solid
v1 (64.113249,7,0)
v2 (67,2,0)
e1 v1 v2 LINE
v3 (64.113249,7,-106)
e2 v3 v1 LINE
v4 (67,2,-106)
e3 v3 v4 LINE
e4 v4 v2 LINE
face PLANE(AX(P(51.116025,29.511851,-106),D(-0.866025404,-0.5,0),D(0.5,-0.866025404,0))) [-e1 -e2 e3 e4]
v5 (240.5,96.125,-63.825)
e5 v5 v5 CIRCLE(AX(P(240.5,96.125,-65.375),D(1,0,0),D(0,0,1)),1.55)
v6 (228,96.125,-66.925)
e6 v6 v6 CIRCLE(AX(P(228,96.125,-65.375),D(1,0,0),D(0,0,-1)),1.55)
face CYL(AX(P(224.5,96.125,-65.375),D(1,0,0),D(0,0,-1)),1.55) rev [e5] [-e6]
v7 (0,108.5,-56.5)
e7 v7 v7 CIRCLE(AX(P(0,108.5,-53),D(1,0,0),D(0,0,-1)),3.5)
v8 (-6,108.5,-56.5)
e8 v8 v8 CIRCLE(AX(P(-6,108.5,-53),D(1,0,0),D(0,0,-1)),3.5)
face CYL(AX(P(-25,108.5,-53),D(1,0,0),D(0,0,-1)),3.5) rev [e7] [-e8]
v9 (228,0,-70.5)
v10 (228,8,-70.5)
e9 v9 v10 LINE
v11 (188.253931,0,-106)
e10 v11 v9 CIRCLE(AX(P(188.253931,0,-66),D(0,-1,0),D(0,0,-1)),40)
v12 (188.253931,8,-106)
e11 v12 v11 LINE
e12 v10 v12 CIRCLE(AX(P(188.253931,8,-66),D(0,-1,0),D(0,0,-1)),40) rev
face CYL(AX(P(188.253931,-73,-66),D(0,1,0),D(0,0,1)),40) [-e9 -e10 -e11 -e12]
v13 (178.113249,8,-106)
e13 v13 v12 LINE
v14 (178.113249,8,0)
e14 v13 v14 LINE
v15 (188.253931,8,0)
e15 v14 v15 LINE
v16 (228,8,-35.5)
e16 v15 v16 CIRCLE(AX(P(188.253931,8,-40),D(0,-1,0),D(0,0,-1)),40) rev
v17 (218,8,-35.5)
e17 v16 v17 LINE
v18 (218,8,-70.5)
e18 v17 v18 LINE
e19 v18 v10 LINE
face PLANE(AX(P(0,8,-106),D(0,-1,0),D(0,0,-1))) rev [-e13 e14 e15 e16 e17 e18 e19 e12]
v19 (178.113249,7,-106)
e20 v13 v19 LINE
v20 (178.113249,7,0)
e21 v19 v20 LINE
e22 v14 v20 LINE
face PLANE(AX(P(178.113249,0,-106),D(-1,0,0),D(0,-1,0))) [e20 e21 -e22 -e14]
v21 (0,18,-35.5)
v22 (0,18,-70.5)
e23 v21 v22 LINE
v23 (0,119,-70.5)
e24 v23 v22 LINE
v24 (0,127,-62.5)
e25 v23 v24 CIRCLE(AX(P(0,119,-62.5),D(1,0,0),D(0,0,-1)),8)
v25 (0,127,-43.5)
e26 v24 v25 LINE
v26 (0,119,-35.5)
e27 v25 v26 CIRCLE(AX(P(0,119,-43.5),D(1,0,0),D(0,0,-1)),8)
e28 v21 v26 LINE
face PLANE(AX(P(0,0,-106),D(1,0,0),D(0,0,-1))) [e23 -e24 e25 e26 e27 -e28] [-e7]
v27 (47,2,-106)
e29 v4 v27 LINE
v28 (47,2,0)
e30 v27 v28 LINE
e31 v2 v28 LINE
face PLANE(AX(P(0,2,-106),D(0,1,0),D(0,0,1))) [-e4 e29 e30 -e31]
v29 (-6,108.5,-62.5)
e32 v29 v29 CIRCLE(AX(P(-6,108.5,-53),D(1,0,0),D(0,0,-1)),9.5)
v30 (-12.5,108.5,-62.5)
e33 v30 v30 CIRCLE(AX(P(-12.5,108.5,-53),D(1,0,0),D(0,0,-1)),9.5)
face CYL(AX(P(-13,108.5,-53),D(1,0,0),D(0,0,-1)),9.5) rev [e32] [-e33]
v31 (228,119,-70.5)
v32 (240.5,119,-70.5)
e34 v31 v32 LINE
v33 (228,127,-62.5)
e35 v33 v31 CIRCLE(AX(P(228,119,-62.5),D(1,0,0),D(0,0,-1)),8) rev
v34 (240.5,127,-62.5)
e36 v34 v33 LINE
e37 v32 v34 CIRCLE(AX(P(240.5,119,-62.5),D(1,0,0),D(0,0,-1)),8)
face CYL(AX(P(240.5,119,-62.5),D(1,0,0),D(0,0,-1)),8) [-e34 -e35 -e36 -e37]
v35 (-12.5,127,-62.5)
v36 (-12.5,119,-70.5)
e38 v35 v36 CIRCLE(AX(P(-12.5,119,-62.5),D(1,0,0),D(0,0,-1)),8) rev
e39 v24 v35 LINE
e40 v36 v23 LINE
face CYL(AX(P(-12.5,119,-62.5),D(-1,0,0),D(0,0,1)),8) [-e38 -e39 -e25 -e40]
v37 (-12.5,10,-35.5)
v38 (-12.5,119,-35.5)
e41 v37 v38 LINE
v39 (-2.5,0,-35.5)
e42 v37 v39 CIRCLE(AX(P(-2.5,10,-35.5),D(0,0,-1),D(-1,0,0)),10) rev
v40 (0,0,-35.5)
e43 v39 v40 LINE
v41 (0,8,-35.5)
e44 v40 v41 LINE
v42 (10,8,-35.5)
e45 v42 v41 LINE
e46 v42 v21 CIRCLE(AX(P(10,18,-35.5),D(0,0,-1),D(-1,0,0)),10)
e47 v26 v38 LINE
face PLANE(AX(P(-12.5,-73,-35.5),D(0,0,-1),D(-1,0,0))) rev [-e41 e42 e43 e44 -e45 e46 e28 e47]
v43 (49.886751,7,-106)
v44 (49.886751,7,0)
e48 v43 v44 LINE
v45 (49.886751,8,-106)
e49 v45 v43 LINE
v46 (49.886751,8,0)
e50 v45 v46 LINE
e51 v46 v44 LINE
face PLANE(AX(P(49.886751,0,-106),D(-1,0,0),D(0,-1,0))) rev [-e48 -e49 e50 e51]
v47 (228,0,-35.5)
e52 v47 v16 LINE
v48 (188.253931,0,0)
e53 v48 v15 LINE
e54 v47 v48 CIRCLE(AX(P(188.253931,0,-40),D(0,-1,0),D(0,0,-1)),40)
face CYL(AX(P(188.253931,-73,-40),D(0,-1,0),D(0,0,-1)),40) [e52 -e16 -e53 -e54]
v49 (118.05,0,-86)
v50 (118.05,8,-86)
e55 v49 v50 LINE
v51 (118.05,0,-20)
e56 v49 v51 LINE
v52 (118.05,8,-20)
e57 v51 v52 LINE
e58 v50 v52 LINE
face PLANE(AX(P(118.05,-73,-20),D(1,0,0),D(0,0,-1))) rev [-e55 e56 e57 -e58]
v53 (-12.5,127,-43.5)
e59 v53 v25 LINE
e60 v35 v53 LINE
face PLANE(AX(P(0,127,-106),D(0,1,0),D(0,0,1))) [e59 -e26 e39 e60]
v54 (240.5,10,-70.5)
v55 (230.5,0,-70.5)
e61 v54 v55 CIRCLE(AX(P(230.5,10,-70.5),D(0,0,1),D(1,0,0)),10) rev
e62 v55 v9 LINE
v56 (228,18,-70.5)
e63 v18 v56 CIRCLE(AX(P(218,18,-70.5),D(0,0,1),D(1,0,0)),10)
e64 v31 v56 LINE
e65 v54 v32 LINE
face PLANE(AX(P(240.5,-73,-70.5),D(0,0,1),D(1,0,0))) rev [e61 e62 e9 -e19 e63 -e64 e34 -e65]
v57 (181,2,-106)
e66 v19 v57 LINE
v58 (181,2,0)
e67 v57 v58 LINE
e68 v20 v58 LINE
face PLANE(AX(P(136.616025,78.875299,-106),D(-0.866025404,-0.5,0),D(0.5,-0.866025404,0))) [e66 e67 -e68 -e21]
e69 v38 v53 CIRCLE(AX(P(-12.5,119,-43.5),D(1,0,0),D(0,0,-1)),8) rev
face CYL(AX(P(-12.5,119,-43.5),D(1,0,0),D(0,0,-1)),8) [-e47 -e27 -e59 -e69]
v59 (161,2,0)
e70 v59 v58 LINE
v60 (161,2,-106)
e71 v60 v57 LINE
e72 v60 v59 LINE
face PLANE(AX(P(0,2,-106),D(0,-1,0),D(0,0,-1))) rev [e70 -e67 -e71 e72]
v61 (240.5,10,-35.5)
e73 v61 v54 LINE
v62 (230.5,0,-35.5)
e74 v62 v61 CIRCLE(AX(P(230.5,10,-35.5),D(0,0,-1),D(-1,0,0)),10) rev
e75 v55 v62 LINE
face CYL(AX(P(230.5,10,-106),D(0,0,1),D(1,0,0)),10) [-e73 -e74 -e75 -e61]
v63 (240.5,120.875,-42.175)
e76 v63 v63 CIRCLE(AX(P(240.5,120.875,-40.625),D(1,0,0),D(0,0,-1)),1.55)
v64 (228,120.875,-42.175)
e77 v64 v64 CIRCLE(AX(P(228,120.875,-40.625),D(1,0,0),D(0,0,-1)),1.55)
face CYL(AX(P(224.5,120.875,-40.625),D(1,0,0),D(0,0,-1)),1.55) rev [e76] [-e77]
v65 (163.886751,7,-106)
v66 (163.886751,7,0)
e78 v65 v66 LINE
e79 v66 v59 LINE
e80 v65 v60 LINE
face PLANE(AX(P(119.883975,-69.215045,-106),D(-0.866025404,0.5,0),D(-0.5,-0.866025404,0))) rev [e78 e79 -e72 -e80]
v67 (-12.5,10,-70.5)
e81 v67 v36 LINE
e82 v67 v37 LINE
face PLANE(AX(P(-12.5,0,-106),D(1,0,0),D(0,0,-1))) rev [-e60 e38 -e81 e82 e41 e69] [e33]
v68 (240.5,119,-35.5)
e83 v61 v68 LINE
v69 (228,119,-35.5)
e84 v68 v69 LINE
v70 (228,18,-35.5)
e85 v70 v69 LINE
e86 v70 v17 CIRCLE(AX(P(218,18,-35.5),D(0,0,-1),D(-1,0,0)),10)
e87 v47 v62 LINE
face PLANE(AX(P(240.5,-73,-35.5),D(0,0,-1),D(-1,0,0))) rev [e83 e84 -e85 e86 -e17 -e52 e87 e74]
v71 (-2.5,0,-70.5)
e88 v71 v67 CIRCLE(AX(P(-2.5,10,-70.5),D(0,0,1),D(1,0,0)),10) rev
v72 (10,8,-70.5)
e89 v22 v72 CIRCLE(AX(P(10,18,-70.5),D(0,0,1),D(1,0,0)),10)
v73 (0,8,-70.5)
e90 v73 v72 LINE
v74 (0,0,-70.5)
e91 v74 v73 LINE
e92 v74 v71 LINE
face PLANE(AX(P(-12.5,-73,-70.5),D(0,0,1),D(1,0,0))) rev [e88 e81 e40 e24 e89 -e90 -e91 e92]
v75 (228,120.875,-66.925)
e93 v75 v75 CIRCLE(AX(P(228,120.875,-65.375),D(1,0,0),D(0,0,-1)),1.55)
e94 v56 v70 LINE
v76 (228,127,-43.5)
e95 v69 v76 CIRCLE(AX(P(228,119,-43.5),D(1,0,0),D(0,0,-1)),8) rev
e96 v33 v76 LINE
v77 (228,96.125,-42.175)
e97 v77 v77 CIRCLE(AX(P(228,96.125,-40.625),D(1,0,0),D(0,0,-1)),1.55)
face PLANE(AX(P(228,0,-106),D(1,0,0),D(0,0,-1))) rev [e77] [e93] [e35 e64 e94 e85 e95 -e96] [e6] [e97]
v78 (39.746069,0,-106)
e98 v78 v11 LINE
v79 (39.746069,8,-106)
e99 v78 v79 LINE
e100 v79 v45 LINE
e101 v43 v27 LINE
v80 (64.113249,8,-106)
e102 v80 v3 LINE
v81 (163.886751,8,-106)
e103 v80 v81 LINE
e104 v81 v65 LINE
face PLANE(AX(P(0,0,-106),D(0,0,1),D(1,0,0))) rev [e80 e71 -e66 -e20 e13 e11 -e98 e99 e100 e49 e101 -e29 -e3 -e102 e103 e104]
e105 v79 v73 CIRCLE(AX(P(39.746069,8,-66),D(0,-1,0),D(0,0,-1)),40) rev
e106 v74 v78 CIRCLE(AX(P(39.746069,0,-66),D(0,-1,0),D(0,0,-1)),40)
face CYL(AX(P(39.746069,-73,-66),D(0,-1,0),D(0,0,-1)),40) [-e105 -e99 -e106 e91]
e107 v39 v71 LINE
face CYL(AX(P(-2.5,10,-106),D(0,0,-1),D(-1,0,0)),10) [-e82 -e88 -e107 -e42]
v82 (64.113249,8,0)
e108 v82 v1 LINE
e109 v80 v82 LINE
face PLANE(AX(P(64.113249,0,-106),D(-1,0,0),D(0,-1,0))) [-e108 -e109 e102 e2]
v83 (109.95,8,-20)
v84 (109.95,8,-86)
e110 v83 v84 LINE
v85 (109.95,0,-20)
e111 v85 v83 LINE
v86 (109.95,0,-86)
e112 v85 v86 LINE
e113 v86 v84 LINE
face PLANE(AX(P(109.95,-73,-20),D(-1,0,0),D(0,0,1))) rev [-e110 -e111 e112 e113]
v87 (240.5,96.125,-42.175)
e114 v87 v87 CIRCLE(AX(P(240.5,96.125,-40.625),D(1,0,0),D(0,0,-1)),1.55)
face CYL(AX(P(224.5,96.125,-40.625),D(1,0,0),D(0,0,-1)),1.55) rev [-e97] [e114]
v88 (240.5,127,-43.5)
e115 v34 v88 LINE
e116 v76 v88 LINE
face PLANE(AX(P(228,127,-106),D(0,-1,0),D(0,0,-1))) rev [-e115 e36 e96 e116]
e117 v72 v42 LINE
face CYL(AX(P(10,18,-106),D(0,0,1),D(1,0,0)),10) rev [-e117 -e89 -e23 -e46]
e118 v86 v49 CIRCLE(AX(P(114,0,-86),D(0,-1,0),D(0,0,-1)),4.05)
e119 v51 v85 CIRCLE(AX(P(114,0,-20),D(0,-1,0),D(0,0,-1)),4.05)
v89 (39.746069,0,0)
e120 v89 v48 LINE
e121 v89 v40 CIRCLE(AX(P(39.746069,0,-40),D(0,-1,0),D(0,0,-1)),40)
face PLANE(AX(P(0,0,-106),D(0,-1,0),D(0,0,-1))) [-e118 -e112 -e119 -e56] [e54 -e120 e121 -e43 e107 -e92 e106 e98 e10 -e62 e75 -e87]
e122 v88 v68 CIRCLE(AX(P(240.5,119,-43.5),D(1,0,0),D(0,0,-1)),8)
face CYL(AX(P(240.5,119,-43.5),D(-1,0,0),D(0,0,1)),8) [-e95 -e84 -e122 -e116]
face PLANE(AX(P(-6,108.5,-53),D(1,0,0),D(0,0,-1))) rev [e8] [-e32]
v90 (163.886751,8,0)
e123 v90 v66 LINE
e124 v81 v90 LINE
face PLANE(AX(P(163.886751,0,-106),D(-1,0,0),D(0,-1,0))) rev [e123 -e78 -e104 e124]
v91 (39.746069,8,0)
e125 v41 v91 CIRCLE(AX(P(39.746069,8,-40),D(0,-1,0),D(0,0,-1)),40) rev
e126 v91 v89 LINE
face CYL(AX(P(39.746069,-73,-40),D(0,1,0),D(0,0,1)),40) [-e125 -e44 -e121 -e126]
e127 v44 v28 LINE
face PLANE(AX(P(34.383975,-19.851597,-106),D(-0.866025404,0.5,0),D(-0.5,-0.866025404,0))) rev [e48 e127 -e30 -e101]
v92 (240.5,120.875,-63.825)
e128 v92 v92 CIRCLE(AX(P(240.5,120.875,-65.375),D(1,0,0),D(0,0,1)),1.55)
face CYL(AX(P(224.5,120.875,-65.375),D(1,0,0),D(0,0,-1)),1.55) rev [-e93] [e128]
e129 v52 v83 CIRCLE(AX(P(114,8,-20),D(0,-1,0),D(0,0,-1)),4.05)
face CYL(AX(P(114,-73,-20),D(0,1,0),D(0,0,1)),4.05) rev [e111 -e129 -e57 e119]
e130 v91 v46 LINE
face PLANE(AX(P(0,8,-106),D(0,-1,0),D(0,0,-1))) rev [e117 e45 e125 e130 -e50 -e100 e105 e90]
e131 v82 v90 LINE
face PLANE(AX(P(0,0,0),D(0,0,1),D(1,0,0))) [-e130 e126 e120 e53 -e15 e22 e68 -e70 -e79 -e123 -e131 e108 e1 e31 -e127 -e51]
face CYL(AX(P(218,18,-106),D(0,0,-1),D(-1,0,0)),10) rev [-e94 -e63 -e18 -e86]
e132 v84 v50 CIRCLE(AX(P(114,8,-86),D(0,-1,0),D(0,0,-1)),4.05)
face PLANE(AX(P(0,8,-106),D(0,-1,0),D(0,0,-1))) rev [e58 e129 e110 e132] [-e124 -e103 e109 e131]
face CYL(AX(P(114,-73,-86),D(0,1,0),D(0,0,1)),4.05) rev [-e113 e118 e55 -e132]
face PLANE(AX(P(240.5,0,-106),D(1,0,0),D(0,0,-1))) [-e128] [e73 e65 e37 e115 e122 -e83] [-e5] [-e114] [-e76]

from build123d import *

# Parameters (mm, degrees)
SKETCH1_W           = 12.5
SKETCH1_H           = 127
BOSS_EXTRUDE1_DEPTH = 106
SKETCH2_W           = 12.5
SKETCH2_H           = 35.5
CUT_EXTRUDE1_DEPTH  = 200
FILLET3_R           = 8
FILLET4_R           = 10
FILLET5_R           = 40
SKETCH5_R           = 3.5
CUT_EXTRUDE5_DEPTH  = 25
CUT_EXTRUDE6_START  = -6
SKETCH5_3_R         = 9.5
SKETCH5_3_R_2       = 3.5
CUT_EXTRUDE6_DEPTH  = 7
SKETCH4_R           = 1.55
CUT_EXTRUDE7_DEPTH  = 16


with BuildPart() as part:
    # Sketch1 → Boss-Extrude1 (new body)
    with BuildSketch(Plane.XY):
        Polygon((0, 8), (0, 0), (228, 0), (228, 8), (178.113248654, 8), (178.113248654, 7), (181, 2), (161, 2), (163.886751346, 7), (163.886751346, 8), (64.113248654, 8), (64.113248654, 7), (67, 2), (47, 2), (49.886751346, 7), (49.886751346, 8), align=None)
        with Locations((234.25, 63.5)):
            Rectangle(SKETCH1_W, SKETCH1_H)
        with Locations((-6.25, 63.5)):
            Rectangle(SKETCH1_W, SKETCH1_H)
    extrude(amount=-BOSS_EXTRUDE1_DEPTH)

    # Sketch2 → Cut-Extrude1 (cut)
    with BuildSketch(Plane(origin=(0, 127, 0), x_dir=(1, 0, 0), z_dir=(0, 1, 0))):
        with Locations((-6.25, 88.25)):
            Rectangle(SKETCH2_W, SKETCH2_H)
        with Locations((-6.25, 17.75)):
            Rectangle(SKETCH2_W, SKETCH2_H)
        with Locations((234.25, 88.25)):
            Rectangle(SKETCH2_W, SKETCH2_H)
        with Locations((234.25, 17.75)):
            Rectangle(SKETCH2_W, SKETCH2_H)
        with BuildLine():
            Line((109.95, 20), (109.95, 86))
            ThreePointArc((109.95, 86), (114, 90.05), (118.05, 86))
            Line((118.05, 86), (118.05, 20))
            ThreePointArc((118.05, 20), (114, 15.95), (109.95, 20))
        make_face()
    extrude(amount=-CUT_EXTRUDE1_DEPTH, mode=Mode.SUBTRACT)

    # Fillet3
    fillet3_edges = [part.edges().sort_by_distance(p)[0] for p in [
        (-6.25, 127, -35.5),
        (234.25, 127, -70.5),
        (234.25, 127, -35.5),
        (-6.25, 127, -70.5),
    ]]
    fillet(fillet3_edges, radius=FILLET3_R)

    # Fillet4
    fillet4_edges = [part.edges().sort_by_distance(p)[0] for p in [
        (228, 8, -53),
        (240.5, 0, -53),
        (0, 8, -53),
        (-12.5, 0, -53),
    ]]
    fillet(fillet4_edges, radius=FILLET4_R)

    # Fillet5
    # the kernel refuses this fillet: 40 mm, written as the material it takes off along each edge
    with BuildSketch(Plane(origin=(228, 107.36517247, -106), x_dir=(-1, 0, 0), z_dir=(0, -1, 0))) as fillet5_piece_1:
        with BuildLine():
            CenterArc((39.746068988, -40), FILLET5_R, 90, 83.540550223)
            Line((0, -35.5), (-0.79492138, -35.41))
            ThreePointArc((-0.79492138, -35.41), (-0.8, -17.75), (-0.8, 0))
            Line((-0.8, 0), (0, 0.8))
            Line((0, 0.8), (39.746068988, 0.8))
            Line((39.746068988, 0.8), (39.746068988, 0))
        make_face()
    extrude(amount=206.73034494, mode=Mode.SUBTRACT)
    with BuildSketch(Plane(origin=(0, 107.36517247, -106), x_dir=(0, 0, 1), z_dir=(0, -1, 0))) as fillet5_piece_2:
        with BuildLine():
            CenterArc((40, -39.746068988), FILLET5_R, 96.459449777, 83.540550223)
            Line((0, -39.746068988), (-0.8, -39.746068988))
            Line((-0.8, -39.746068988), (-0.8, 0))
            Line((-0.8, 0), (0, 0.8))
            ThreePointArc((0, 0.8), (17.75, 0.8), (35.41, 0.79492138))
            Line((35.41, 0.79492138), (35.5, 0))
        make_face()
    extrude(amount=206.73034494, mode=Mode.SUBTRACT)
    with BuildSketch(Plane(origin=(0, 107.36517247, 0), x_dir=(0, 0, -1), z_dir=(0, -1, 0))) as fillet5_piece_3:
        with BuildLine():
            CenterArc((40, 39.746068988), FILLET5_R, 180, 83.540550223)
            Line((0, 39.746068988), (-0.8, 39.746068988))
            Line((-0.8, 39.746068988), (-0.8, 0))
            Line((-0.8, 0), (0, -0.8))
            ThreePointArc((0, -0.8), (17.75, -0.8), (35.41, -0.79492138))
            Line((35.41, -0.79492138), (35.5, 0))
        make_face()
    extrude(amount=206.73034494, mode=Mode.SUBTRACT)
    with BuildSketch(Plane(origin=(228, 107.36517247, 0), x_dir=(-1, 0, 0), z_dir=(0, -1, 0))) as fillet5_piece_4:
        with BuildLine():
            CenterArc((39.746068988, 40), FILLET5_R, 186.459449777, 83.540550223)
            Line((0, 35.5), (-0.79492138, 35.41))
            ThreePointArc((-0.79492138, 35.41), (-0.8, 17.75), (-0.8, 0))
            Line((-0.8, 0), (0, -0.8))
            Line((0, -0.8), (39.746068988, -0.8))
            Line((39.746068988, -0.8), (39.746068988, 0))
        make_face()
    extrude(amount=206.73034494, mode=Mode.SUBTRACT)

    # Sketch5 → Cut-Extrude5 (cut)
    with BuildSketch(Plane(origin=(0, 0, 0), x_dir=(0, 0, -1), z_dir=(1, 0, 0))):
        with Locations((53, 108.5)):
            Circle(SKETCH5_R)
    extrude(amount=-CUT_EXTRUDE5_DEPTH, mode=Mode.SUBTRACT)

    # Sketch5<3> → Cut-Extrude6 (cut)
    with BuildSketch(Plane(origin=(0, 0, 0), x_dir=(0, 0, -1), z_dir=(1, 0, 0)).offset(CUT_EXTRUDE6_START)):
        with Locations((53, 108.5)):
            Circle(SKETCH5_3_R)
        with Locations((53, 108.5)):
            Circle(SKETCH5_3_R_2, mode=Mode.SUBTRACT)
    extrude(amount=-CUT_EXTRUDE6_DEPTH, mode=Mode.SUBTRACT)

    # Sketch4 → Cut-Extrude7 (cut)
    with BuildSketch(Plane(origin=(240.5, 0, 0), x_dir=(0, 0, -1), z_dir=(1, 0, 0))):
        with Locations((40.625, 120.875)):
            Circle(SKETCH4_R)
        with Locations((40.625, 96.125)):
            Circle(SKETCH4_R)
        with Locations((65.375, 96.125)):
            Circle(SKETCH4_R)
        with Locations((65.375, 120.875)):
            Circle(SKETCH4_R)
    extrude(amount=-CUT_EXTRUDE7_DEPTH, mode=Mode.SUBTRACT)


solid = part.part
